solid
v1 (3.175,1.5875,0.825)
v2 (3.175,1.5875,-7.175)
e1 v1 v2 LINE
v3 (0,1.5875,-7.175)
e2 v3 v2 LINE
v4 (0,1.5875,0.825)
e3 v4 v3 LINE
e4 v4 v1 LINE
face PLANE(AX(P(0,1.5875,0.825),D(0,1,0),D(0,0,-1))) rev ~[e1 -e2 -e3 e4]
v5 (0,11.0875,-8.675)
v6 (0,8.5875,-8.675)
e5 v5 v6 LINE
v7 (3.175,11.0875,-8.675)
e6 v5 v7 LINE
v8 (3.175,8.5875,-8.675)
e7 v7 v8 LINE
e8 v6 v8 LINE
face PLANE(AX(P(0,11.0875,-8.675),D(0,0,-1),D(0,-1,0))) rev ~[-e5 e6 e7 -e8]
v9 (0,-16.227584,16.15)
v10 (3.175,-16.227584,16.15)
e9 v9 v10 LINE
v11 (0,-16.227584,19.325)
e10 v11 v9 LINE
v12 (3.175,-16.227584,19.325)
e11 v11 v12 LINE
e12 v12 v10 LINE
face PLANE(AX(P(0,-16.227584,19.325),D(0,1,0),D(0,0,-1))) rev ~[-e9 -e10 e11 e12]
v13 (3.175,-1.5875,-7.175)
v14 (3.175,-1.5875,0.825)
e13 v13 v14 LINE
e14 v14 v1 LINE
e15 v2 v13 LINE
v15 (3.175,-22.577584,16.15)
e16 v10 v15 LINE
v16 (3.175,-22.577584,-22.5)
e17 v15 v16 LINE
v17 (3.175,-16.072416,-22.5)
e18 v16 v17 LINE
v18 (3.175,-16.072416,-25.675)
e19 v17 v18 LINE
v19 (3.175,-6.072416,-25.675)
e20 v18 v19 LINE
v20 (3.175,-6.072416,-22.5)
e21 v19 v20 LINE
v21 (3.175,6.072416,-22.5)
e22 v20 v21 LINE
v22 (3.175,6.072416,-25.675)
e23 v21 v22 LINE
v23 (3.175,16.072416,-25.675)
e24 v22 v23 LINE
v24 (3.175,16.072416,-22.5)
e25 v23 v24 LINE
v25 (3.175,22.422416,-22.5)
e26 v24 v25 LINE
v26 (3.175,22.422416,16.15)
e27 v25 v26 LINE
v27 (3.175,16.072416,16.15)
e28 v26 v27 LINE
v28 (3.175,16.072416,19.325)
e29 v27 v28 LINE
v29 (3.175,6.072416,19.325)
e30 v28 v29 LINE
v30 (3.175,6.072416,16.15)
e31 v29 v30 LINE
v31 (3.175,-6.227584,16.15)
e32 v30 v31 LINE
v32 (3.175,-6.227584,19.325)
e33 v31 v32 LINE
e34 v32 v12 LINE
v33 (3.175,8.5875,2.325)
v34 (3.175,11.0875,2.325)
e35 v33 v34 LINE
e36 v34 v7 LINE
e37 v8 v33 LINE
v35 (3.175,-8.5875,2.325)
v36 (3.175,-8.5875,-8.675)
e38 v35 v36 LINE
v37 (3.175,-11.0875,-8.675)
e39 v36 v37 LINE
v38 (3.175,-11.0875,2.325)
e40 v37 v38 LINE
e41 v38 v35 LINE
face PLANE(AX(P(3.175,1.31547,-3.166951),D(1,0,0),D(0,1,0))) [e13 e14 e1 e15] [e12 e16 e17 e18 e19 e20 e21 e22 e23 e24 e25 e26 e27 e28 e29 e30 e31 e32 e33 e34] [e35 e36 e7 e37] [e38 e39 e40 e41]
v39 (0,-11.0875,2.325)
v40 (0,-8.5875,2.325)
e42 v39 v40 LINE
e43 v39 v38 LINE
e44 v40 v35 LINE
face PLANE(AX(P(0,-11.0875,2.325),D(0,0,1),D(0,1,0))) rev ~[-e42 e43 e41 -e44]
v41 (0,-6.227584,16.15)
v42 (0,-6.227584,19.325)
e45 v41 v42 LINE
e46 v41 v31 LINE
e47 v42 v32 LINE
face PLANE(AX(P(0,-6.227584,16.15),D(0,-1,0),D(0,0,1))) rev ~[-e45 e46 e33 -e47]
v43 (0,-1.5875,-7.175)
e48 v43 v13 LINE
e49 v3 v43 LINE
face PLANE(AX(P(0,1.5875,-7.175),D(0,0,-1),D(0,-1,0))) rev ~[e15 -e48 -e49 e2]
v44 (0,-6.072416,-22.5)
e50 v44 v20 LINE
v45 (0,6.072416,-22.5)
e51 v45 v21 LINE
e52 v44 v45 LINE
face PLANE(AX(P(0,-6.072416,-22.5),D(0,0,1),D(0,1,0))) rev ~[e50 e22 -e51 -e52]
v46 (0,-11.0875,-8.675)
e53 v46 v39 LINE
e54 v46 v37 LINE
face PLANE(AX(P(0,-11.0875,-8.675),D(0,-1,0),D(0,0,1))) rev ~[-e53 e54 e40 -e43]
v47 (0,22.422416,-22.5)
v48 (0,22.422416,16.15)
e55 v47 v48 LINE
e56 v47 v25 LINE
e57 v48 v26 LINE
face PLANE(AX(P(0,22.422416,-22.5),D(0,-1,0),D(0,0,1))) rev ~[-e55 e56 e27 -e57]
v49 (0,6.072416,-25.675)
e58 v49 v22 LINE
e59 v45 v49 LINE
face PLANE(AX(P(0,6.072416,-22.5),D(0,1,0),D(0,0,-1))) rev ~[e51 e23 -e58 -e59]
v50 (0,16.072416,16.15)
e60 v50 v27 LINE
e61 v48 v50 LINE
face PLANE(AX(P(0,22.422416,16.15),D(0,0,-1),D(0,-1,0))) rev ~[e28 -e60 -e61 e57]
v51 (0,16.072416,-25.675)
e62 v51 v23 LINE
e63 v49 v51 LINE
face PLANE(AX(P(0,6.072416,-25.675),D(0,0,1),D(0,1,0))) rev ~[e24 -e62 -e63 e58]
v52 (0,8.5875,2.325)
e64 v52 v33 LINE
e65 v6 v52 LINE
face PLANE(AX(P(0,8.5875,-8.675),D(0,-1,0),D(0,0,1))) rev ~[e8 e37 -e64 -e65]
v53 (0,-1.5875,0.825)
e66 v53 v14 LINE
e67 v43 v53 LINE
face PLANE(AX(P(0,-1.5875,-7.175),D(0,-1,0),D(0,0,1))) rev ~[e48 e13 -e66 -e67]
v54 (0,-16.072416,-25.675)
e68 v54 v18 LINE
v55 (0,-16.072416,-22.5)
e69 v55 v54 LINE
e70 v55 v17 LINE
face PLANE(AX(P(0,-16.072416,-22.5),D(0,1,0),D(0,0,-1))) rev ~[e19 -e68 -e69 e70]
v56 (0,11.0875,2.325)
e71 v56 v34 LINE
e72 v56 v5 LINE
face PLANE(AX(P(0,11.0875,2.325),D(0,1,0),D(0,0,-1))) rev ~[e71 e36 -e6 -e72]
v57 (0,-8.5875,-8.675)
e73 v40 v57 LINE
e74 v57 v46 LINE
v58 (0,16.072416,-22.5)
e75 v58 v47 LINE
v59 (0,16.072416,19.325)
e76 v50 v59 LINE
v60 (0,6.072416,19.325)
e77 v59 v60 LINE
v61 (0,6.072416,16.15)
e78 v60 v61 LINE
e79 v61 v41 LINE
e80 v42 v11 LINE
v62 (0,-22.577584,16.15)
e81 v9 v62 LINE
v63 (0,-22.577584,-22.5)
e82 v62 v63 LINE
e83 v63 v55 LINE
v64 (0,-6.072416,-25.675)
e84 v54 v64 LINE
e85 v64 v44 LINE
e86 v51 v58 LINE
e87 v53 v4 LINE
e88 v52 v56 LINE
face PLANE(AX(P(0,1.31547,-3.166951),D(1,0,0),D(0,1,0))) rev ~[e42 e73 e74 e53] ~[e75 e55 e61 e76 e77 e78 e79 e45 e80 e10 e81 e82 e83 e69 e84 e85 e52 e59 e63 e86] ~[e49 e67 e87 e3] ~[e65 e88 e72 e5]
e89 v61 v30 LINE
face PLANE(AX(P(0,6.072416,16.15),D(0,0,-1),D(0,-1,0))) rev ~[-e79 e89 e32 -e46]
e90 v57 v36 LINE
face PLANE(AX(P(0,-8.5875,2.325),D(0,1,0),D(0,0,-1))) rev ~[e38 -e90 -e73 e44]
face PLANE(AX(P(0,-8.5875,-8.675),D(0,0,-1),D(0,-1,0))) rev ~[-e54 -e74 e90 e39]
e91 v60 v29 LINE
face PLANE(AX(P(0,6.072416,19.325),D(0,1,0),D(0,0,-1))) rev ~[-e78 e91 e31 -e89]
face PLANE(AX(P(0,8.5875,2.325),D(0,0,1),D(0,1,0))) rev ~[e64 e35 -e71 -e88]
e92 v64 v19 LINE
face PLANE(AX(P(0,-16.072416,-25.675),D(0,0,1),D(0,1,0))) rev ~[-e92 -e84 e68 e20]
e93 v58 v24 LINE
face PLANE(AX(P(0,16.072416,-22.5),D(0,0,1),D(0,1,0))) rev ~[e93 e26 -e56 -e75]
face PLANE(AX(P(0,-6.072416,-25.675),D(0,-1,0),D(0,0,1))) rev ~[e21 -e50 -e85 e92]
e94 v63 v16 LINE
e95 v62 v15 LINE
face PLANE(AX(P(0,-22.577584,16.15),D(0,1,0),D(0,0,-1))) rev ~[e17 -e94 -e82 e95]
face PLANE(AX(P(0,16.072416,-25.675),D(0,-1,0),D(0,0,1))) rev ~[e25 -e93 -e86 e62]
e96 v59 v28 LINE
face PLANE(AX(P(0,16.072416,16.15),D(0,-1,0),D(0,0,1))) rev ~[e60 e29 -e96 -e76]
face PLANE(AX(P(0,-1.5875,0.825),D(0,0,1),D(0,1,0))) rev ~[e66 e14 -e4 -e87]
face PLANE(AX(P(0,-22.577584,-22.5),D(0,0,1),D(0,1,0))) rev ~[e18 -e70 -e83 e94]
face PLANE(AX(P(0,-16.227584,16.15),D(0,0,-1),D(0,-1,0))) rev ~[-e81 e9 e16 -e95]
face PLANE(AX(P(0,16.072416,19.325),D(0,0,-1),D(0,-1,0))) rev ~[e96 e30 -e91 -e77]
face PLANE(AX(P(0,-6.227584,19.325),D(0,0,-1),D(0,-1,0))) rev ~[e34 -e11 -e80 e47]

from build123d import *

# Parameters (mm, degrees)
F1_DEPTH = 3.175


# Not quite as in the source:
# - a length typed as a fraction of an inch, garbled in the dataset ("3 / 203.2 mm" for 3/8 in), is restored


with BuildPart() as f1:
    # F0 (on Right) → F1 (new body)
    with BuildSketch(Plane.YZ):
        Polygon((16.0724163434, -25.675), (16.0724163434, -22.5), (22.4224163434, -22.5), (22.4224163434, 16.15), (16.0724163434, 16.15), (16.0724163434, 19.325), (6.0724163434, 19.325), (6.0724163434, 16.15), (-6.2275836566, 16.15), (-6.2275836566, 19.325), (-16.2275836566, 19.325), (-16.2275836566, 16.15), (-19.4025836566, 16.15), (-19.325, -22.5), (-16.0724163434, -22.5), (-16.0724163434, -25.675), (-6.0724163434, -25.675), (-6.0724163434, -24.0875), (-6.0724163434, -22.5), (6.0724163434, -22.5), (6.0724163434, -24.0875), (6.0724163434, -25.675), align=None)
        Polygon((-8.5875, 2.325), (-8.5875, -3.175), (-8.5875, -8.675), (-11.0875, -8.675), (-11.0875, 2.325), align=None, mode=Mode.SUBTRACT)
        Polygon((1.5875, -3.175), (1.5875, -7.175), (-1.5875, -7.175), (-1.5875, -3.175), (-1.5875, 0.825), (1.5875, 0.825), align=None, mode=Mode.SUBTRACT)
        Polygon((8.5875, -8.675), (8.5875, -3.175), (8.5875, 2.325), (11.0875, 2.325), (11.0875, -8.675), align=None, mode=Mode.SUBTRACT)
        Polygon((-22.5775836566, -22.5), (-19.325, -22.5), (-19.4025836566, 16.15), (-22.5775836566, 16.15), align=None)
    extrude(amount=F1_DEPTH)


solid = f1.part
